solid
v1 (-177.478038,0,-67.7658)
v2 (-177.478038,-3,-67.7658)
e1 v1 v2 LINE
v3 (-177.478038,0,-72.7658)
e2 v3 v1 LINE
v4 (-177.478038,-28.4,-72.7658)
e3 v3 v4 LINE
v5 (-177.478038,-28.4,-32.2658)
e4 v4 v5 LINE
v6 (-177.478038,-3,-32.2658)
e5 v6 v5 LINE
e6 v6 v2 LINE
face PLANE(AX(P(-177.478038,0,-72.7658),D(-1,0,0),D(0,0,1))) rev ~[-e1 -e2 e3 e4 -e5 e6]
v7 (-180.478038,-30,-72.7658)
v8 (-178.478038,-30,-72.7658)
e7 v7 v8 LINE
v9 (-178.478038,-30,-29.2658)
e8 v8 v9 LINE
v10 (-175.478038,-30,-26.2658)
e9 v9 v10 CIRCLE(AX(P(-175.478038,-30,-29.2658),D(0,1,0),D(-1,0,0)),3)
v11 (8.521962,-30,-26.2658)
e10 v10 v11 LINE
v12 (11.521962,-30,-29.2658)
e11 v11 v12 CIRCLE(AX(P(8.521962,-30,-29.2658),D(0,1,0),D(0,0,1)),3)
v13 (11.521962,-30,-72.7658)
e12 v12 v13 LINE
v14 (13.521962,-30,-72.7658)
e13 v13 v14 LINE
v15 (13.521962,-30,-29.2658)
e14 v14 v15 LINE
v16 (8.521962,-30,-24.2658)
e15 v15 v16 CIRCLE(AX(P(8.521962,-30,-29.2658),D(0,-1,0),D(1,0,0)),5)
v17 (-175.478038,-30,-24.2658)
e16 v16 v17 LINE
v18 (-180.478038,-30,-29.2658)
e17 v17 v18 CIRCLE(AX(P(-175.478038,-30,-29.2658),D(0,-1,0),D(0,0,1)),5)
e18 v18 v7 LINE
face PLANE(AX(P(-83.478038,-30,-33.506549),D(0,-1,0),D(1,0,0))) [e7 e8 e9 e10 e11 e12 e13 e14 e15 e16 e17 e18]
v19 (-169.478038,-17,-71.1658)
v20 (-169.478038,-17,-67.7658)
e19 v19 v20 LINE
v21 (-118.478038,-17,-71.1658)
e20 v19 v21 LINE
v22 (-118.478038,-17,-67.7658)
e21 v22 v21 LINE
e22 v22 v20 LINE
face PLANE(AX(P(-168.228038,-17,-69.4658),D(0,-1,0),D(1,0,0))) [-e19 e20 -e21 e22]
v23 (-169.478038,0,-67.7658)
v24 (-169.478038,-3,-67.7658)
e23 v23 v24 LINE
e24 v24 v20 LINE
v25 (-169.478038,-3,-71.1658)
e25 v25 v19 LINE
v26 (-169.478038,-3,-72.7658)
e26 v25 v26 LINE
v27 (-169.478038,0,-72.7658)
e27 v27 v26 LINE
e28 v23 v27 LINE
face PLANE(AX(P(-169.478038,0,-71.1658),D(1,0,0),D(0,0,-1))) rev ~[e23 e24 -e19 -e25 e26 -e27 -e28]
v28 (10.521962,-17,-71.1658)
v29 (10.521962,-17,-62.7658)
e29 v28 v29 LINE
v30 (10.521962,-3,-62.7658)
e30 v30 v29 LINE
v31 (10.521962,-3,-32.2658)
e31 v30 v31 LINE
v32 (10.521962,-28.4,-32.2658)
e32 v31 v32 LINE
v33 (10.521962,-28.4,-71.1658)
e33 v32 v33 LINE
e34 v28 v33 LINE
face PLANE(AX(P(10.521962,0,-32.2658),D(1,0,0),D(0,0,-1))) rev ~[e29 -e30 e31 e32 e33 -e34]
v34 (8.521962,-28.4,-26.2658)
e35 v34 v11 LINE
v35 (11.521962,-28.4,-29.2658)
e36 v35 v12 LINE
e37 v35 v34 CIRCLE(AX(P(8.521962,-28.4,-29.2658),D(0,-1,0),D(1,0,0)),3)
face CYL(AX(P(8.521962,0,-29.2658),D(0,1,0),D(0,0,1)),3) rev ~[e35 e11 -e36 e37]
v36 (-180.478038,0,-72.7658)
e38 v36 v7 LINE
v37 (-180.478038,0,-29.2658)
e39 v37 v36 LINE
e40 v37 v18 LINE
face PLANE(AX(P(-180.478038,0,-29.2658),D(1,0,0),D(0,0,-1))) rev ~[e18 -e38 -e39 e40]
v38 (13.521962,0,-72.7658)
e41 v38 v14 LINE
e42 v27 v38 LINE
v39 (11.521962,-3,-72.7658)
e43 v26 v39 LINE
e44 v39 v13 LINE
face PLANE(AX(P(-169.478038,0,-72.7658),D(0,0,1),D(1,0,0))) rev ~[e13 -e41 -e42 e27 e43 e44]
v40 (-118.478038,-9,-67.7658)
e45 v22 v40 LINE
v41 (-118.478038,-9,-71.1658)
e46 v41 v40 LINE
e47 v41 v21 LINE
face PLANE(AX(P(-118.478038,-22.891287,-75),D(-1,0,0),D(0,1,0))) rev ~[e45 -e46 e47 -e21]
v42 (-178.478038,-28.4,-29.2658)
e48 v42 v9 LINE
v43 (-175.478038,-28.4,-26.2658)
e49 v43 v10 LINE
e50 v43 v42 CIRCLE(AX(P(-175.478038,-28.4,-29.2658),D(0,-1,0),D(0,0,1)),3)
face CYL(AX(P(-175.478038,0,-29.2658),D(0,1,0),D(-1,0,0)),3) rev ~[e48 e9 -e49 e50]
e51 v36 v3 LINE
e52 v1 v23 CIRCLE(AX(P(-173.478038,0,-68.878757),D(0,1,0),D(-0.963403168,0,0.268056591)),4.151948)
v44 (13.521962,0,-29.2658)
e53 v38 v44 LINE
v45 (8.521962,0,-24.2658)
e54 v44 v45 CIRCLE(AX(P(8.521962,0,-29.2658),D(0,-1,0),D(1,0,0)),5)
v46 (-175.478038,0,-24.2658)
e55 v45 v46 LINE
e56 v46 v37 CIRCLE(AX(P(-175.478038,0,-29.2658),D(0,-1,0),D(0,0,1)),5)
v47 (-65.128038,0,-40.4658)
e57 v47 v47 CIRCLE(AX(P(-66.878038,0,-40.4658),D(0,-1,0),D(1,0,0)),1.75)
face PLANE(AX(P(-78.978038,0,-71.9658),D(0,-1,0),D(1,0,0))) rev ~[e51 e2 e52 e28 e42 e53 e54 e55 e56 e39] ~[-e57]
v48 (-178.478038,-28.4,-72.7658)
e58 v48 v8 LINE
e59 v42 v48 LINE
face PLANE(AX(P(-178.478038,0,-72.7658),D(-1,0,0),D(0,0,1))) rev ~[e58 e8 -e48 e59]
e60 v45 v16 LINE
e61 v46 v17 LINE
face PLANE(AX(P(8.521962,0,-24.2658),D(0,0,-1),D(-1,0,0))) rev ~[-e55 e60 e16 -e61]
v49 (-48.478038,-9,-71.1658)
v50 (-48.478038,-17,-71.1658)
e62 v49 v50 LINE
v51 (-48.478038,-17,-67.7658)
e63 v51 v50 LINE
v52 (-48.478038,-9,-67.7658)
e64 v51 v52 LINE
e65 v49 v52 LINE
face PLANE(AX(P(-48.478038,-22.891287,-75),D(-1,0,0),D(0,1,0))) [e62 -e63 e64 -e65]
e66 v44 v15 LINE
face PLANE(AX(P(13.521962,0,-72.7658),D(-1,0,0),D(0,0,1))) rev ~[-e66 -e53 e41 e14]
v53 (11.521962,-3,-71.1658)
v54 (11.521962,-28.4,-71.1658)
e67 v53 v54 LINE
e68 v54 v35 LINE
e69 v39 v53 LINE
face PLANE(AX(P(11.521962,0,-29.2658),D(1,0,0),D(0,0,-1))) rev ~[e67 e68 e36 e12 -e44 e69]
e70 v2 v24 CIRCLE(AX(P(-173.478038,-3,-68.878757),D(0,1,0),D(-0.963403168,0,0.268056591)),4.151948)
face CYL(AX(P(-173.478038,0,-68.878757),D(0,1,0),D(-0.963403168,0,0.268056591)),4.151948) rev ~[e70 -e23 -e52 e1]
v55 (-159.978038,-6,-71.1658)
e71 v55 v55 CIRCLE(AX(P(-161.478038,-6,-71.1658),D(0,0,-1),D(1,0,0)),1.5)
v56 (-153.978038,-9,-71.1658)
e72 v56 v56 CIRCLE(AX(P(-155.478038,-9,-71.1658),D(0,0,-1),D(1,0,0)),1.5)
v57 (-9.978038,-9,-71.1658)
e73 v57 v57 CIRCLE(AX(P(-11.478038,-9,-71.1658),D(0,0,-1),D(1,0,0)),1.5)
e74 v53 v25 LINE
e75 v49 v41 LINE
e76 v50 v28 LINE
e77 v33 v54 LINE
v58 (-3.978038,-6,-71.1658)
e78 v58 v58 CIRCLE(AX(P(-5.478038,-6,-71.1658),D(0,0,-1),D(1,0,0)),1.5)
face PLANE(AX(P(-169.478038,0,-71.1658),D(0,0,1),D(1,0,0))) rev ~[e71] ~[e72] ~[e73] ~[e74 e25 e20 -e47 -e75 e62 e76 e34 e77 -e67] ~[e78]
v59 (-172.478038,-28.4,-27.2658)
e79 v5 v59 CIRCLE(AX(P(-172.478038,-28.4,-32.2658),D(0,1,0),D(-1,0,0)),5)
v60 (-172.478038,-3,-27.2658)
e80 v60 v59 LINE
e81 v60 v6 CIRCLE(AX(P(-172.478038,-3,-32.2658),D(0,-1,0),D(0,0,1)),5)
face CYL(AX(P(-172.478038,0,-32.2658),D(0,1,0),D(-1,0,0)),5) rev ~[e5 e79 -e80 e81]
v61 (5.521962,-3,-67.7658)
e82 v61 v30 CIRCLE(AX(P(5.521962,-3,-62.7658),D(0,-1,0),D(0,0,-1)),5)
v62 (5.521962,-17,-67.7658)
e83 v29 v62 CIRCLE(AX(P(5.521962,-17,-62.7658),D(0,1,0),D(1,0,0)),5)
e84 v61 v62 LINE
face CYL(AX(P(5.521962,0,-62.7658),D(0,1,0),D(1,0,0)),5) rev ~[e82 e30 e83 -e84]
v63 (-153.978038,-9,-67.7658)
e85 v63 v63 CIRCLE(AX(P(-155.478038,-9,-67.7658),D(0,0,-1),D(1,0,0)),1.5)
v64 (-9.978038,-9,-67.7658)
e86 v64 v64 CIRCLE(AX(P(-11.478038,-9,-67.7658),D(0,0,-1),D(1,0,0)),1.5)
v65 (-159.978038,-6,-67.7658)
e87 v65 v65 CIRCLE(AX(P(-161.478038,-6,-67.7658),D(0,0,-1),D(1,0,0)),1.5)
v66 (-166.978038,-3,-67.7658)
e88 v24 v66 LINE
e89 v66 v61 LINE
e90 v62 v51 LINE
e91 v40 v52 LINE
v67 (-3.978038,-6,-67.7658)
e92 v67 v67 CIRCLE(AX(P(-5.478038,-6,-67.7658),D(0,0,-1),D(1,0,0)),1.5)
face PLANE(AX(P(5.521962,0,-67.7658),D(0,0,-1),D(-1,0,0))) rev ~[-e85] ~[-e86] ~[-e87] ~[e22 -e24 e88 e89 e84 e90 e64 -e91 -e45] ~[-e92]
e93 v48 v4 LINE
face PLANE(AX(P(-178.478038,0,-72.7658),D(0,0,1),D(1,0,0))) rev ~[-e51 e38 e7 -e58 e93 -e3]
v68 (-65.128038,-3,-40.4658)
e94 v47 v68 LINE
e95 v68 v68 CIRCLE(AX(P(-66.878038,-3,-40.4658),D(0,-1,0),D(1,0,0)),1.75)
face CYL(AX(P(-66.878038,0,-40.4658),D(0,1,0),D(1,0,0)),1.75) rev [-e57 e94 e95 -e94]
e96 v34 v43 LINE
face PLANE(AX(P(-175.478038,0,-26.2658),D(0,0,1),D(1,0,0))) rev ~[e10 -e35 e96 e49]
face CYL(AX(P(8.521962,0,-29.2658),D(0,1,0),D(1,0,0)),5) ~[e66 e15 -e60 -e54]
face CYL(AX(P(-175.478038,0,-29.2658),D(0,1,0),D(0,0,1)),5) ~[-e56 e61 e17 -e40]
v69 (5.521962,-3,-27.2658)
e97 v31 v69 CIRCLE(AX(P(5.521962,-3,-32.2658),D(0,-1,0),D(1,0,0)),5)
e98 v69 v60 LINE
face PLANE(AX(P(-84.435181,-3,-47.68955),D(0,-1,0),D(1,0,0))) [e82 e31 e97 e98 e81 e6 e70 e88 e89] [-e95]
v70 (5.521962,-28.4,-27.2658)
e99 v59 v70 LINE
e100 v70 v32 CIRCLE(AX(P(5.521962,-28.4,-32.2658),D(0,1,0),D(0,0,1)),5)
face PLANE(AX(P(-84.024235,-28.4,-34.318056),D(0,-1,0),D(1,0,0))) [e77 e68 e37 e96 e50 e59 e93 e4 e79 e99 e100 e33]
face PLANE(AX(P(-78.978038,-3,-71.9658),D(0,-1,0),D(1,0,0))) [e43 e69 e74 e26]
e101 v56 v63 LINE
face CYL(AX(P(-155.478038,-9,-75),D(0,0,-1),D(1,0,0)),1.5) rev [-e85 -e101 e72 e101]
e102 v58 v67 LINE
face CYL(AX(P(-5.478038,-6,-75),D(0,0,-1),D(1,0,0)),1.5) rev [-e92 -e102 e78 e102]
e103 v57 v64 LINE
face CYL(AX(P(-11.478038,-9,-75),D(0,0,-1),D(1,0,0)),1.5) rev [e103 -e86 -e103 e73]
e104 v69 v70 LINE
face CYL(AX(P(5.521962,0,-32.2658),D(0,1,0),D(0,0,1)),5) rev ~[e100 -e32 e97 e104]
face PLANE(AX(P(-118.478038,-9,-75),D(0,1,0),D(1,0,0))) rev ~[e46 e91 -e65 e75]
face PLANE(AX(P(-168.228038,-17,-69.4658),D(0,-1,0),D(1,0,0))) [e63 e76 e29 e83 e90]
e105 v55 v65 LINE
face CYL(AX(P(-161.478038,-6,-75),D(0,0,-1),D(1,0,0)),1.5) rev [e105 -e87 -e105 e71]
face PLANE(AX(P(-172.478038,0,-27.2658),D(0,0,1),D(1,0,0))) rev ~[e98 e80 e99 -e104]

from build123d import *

# Parameters (mm, degrees)
F1_DEPTH = 30
F2_DEPTH = 28.4
F0_W     = 2.5
F0_H     = 3.4
F0_W_2   = 3
F0_W_3   = 7
F0_W_4   = 35.5
F0_W_5   = 70
F3_DEPTH = 17
F0_R     = 1.75
F4_DEPTH = 3
F6_DEPTH = 25
F7_R     = 1.5
F7_W     = 70
F7_H     = 13.8912867606
F8_DEPTH = 25


# Not quite as in the source:
# - ends of sketch curves that miss each other by under 0.0002 mm in the source are joined


with BuildPart() as f1:
    # F0 (on Front) → F1 (new body)
    with BuildSketch(Plane.XZ):
        with BuildLine():
            Line((-180.478038, -29.2658), (-180.478038, -72.7658))
            Line((-180.478038, -72.7658), (-178.478038, -72.7658))
            Line((-178.478038, -72.7658), (-178.478038, -29.2658))
            ThreePointArc((-178.478038, -29.2658), (-177.5993583436, -27.1444796564), (-175.478038, -26.2658))
            Line((-175.478038, -26.2658), (8.521962, -26.2658))
            ThreePointArc((8.521962, -26.2658), (10.6432823436, -27.1444796564), (11.521962, -29.2658))
            Line((11.521962, -29.2658), (11.521962, -71.1658))
            Line((11.521962, -71.1658), (11.521962, -72.7658))
            Line((11.521962, -72.7658), (13.521962, -72.7658))
            Line((13.521962, -72.7658), (13.521962, -29.2658))
            ThreePointArc((13.521962, -29.2658), (12.0574959059, -25.7302660941), (8.521962, -24.2658))
            Line((8.521962, -24.2658), (-175.478038, -24.2658))
            ThreePointArc((-175.478038, -24.2658), (-179.0135719059, -25.7302660941), (-180.478038, -29.2658))
        make_face()
    extrude(amount=F1_DEPTH)

    # F0 (on Front) → F2 (join)
    with BuildSketch(Plane.XZ):
        with BuildLine():
            Line((-178.478038, -29.2658), (-178.478038, -72.7658))
            Line((-178.478038, -72.7658), (-177.478038, -72.7658))
            Line((-177.478038, -72.7658), (-177.478038, -67.7658000352))
            Line((-177.478038, -67.7658000352), (-177.478038, -32.2658))
            ThreePointArc((-177.478038, -32.2658), (-176.0135719059, -28.7302660941), (-172.478038, -27.2658))
            Line((-172.478038, -27.2658), (5.521962, -27.2658))
            ThreePointArc((5.521962, -27.2658), (9.0574959059, -28.7302660941), (10.521962, -32.2658))
            Line((10.521962, -32.2658), (10.521962, -62.7658))
            Line((10.521962, -62.7658), (10.521962, -71.1658))
            Line((10.521962, -71.1658), (11.521962, -71.1658))
            Line((11.521962, -71.1658), (11.521962, -29.2658))
            ThreePointArc((11.521962, -29.2658), (10.6432823436, -27.1444796564), (8.521962, -26.2658))
            Line((8.521962, -26.2658), (-175.478038, -26.2658))
            ThreePointArc((-175.478038, -26.2658), (-177.5993583436, -27.1444796564), (-178.478038, -29.2658))
        make_face()
    extrude(amount=F2_DEPTH)

    # F0 (on Front) → F3 (join)
    with BuildSketch(Plane.XZ):
        with Locations((-168.228038, -69.4658)):
            Rectangle(F0_W, F0_H)
        with Locations((-165.478038, -69.4658)):
            Rectangle(F0_W_2, F0_H)
        with Locations((-160.478038, -69.4658)):
            Rectangle(F0_W_3, F0_H)
        with Locations((-155.478038, -69.4658)):
            Rectangle(F0_W_2, F0_H)
        with Locations((-136.228038, -69.4658)):
            Rectangle(F0_W_4, F0_H)
        with Locations((-83.478038, -69.4658)):
            Rectangle(F0_W_5, F0_H)
        with Locations((-30.728038, -69.4658)):
            Rectangle(F0_W_4, F0_H)
        with Locations((-11.478038, -69.4658)):
            Rectangle(F0_W_2, F0_H)
        with Locations((-6.478038, -69.4658)):
            Rectangle(F0_W_3, F0_H)
        with Locations((-1.478038, -69.4658)):
            Rectangle(F0_W_2, F0_H)
        with BuildLine():
            Line((0.021962, -71.1658), (10.521962, -71.1658))
            Line((10.521962, -71.1658), (10.521962, -62.7658))
            ThreePointArc((10.521962, -62.7658), (9.0574959059, -66.3013339059), (5.521962, -67.7658))
            Line((5.521962, -67.7658), (0.021962, -67.7658))
            Line((0.021962, -67.7658), (0.021962, -71.1658))
        make_face()
    extrude(amount=F3_DEPTH)

    # F0 (on Front) → F4 (join)
    with BuildSketch(Plane.XZ):
        Polygon((-166.978038, -71.1658), (-169.478038, -71.1658), (-169.478038, -72.7658), (11.521962, -72.7658), (11.521962, -71.1658), (10.521962, -71.1658), (0.021962, -71.1658), (-2.978038, -71.1658), (-9.978038, -71.1658), (-12.978038, -71.1658), (-48.478038, -71.1658), (-118.478038, -71.1658), (-153.978038, -71.1658), (-156.978038, -71.1658), (-163.978038, -71.1658), align=None)
        with BuildLine():
            Line((-177.478038, -32.2658), (-177.478038, -67.7658000352))
            ThreePointArc((-177.478038, -67.7658000352), (-173.478038, -64.726809), (-169.4780381264, -67.7658000352))
            Line((-169.4780381264, -67.7658000352), (-166.978038, -67.7658))
            Line((-166.978038, -67.7658), (-163.978038, -67.7658))
            Line((-163.978038, -67.7658), (-156.978038, -67.7658))
            Line((-156.978038, -67.7658), (-153.978038, -67.7658))
            Line((-153.978038, -67.7658), (-118.478038, -67.7658))
            Line((-118.478038, -67.7658), (-48.478038, -67.7658))
            Line((-48.478038, -67.7658), (-12.978038, -67.7658))
            Line((-12.978038, -67.7658), (-9.978038, -67.7658))
            Line((-9.978038, -67.7658), (-2.978038, -67.7658))
            Line((-2.978038, -67.7658), (0.021962, -67.7658))
            Line((0.021962, -67.7658), (5.521962, -67.7658))
            ThreePointArc((5.521962, -67.7658), (9.0574959059, -66.3013339059), (10.521962, -62.7658))
            Line((10.521962, -62.7658), (10.521962, -32.2658))
            ThreePointArc((10.521962, -32.2658), (9.0574959059, -28.7302660941), (5.521962, -27.2658))
            Line((5.521962, -27.2658), (-172.478038, -27.2658))
            ThreePointArc((-172.478038, -27.2658), (-176.0135719059, -28.7302660941), (-177.478038, -32.2658))
        make_face()
        with Locations((-66.878038, -40.4658)):
            Circle(F0_R, mode=Mode.SUBTRACT)
    extrude(amount=F4_DEPTH)

    # F7 (on offset) → F8 (cut)
    with BuildSketch(Plane.XY.offset(-75)):
        with Locations((-11.478038, -9)):
            Circle(F7_R)
        with Locations((-5.478038, -6)):
            Circle(F7_R)
        with Locations((-83.478038, -15.9456433803)):
            Rectangle(F7_W, F7_H)
        with Locations((-161.478038, -6)):
            Circle(F7_R)
        with Locations((-155.478038, -9)):
            Circle(F7_R)
    extrude(amount=F8_DEPTH, mode=Mode.SUBTRACT)


with BuildPart() as f6:
    # F0 (on Front) → F6 (new body)
    with BuildSketch(Plane.XZ):
        Polygon((-177.478038, 13.4356050125), (-177.478038, 12.671673), (-169.478038, 12.671673), (-169.478038, 27.071673), (-118.478038, 27.071673), (-118.478038, 19.571673), (-48.478038, 19.571673), (-48.478038, 27.071673), (10.521962, 27.071673), (10.521962, 38.071673), (-177.478038, 38.071673), (-177.478038, 33.071673), align=None)
    extrude(amount=F6_DEPTH)


solid = f1.part
